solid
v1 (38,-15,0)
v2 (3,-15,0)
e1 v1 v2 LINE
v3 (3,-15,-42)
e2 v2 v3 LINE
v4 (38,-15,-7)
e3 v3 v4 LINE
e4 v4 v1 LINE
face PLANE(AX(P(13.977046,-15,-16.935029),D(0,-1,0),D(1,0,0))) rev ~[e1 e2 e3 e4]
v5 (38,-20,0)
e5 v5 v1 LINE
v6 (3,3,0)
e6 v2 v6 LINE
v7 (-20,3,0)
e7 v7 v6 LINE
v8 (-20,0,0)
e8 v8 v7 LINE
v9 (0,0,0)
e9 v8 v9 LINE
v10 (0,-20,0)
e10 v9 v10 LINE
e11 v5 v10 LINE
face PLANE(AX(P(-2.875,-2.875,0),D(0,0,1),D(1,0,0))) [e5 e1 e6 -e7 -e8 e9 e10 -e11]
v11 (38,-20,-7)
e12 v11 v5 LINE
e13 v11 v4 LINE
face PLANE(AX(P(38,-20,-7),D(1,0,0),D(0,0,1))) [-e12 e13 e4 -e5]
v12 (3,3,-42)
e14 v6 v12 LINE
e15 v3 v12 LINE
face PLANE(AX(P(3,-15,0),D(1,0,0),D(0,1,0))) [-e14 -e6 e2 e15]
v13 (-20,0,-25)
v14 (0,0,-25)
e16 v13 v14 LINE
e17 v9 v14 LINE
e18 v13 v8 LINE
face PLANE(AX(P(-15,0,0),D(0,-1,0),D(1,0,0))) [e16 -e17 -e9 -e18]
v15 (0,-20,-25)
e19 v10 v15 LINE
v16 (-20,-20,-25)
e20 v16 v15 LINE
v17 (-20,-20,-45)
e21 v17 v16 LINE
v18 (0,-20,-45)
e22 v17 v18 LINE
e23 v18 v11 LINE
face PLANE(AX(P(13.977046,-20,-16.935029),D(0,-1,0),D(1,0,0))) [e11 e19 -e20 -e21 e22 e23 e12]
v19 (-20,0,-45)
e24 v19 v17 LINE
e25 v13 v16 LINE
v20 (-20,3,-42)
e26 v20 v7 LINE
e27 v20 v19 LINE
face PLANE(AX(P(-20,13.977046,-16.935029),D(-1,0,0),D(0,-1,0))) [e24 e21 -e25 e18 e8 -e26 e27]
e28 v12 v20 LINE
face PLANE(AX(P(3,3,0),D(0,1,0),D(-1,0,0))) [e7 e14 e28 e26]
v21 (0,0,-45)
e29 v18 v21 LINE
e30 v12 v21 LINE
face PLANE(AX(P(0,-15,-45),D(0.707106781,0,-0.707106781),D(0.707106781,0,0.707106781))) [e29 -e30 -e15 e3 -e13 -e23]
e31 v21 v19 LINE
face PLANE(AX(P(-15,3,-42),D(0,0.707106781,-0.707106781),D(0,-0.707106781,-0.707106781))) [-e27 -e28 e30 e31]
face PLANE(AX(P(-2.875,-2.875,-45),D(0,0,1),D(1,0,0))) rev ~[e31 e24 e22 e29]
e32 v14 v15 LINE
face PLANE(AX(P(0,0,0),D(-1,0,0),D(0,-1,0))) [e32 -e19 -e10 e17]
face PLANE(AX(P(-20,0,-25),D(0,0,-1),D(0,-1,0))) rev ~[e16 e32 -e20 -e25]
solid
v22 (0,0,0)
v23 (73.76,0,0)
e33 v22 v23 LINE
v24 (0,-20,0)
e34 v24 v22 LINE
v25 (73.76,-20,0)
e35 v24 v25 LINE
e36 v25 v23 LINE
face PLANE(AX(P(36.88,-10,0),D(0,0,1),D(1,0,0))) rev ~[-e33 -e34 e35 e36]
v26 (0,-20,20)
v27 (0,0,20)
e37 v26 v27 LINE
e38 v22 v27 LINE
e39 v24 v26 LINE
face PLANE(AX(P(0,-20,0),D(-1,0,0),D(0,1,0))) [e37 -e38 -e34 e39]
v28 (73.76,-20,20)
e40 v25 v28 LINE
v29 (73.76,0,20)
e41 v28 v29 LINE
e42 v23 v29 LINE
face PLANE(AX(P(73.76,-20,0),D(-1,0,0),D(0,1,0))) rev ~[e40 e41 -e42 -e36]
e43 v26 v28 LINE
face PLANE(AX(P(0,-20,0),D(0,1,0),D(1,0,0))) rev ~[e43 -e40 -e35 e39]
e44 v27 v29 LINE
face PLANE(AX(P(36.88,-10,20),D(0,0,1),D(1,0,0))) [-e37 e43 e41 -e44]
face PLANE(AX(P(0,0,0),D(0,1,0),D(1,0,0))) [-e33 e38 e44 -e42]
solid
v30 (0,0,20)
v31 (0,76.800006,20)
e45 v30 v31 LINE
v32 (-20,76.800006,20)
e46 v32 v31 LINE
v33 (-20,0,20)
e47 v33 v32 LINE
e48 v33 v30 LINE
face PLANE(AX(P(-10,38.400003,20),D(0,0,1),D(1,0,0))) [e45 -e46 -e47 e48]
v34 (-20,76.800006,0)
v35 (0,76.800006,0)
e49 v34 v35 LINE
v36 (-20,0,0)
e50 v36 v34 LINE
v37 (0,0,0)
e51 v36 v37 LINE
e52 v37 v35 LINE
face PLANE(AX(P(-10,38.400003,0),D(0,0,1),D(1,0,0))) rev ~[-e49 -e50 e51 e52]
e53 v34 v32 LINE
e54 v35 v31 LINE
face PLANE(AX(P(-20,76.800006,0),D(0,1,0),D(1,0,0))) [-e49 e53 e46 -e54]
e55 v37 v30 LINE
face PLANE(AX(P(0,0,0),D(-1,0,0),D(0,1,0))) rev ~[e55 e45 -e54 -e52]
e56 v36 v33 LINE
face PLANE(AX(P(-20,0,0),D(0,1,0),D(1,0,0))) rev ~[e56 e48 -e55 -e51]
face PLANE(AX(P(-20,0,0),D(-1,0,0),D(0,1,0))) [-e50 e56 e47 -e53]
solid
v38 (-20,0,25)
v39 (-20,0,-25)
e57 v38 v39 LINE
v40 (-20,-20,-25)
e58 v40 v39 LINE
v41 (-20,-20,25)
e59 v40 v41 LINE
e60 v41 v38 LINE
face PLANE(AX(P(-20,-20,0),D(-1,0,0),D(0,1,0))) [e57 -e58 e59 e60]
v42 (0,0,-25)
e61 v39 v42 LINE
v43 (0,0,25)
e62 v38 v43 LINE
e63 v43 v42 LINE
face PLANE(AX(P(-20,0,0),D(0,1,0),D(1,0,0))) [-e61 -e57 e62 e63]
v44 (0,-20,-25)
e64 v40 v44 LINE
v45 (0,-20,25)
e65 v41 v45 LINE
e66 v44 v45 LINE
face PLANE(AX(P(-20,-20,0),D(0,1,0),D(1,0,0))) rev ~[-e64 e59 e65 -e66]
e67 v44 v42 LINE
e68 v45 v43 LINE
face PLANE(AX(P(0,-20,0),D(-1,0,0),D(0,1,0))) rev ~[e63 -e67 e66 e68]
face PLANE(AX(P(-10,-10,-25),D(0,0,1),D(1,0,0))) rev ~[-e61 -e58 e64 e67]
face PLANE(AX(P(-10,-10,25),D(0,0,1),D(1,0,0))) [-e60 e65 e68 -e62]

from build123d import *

# Parameters (mm, degrees)
F0_W          = 20
F0_H          = 76.8000064468
F1_DEPTH      = 20
F0_W_2        = 73.7599998636
F0_H_2        = 20
F2_DEPTH      = 25
F2_DEPTH_BACK = 25
F3_W          = 20
F3_H          = 20
F4_DEPTH      = 20
F5_DEPTH      = 5
F7_DEPTH      = 5
F9_DEPTH      = 45
F10_DEPTH     = 25
F11_DEPTH     = 25
F12_DEPTH     = 25


with BuildPart() as f1:
    # F0 (on Top) → F1 (new body)
    with BuildSketch(Plane.XY):
        with Locations((-10, 38.4000032234)):
            Rectangle(F0_W, F0_H)
    extrude(amount=F1_DEPTH)


with BuildPart() as f1b:
    # F0 (on Top) → F1, piece 2 (new body)
    with BuildSketch(Plane.XY):
        with Locations((36.8799999318, -10)):
            Rectangle(F0_W_2, F0_H_2)
    extrude(amount=F1_DEPTH)


with BuildPart() as f2:
    # F0 (on Top) → F2 (new body, two sides)
    with BuildSketch(Plane.XY) as f2_sk:
        with Locations((-10, -10)):
            Rectangle(F0_W, F0_H_2)
    extrude(amount=-F2_DEPTH)
    extrude(f2_sk.sketch, amount=F2_DEPTH_BACK)


with BuildPart() as f4:
    # F3 (on face) → F4 (new body)
    with BuildSketch(Plane(origin=(-20, 0, 0), x_dir=(0, -1, 0), z_dir=(-1, 0, 0))):
        with Locations((10, -35)):
            Rectangle(F3_W, F3_H)
    extrude(amount=-F4_DEPTH)

    # F3 (on face) → F5 (join)
    with BuildSketch(Plane(origin=(-20, 0, 0), x_dir=(0, -1, 0), z_dir=(-1, 0, 0))):
        Polygon((0, -45), (0, -25), (0, 0), (-38, 0), (-38, -7), align=None)
    extrude(amount=-F5_DEPTH)

    # F6 (on face) → F7 (join)
    with BuildSketch(Plane.XZ.offset(20)):
        Polygon((0, -25), (0, -45), (38, -7), (38, 0), (0, 0), align=None)
    extrude(amount=-F7_DEPTH)

    # F8 (on Top) → F9 (join)
    with BuildSketch(Plane.XY):
        Polygon((3, 3), (-15, 3), (-15, 0), (0, 0), (0, -15), (3, -15), align=None)
    extrude(amount=-F9_DEPTH)

    # F10 (cut): a face of the model
    f10_faces = [f4.faces().sort_by_distance(p)[0] for p in [
        (-15, 2, -44),
    ]]
    extrude(f10_faces, amount=-F10_DEPTH, mode=Mode.SUBTRACT)

    # F11 (cut): a face of the model
    f11_faces = [f4.faces().sort_by_distance(p)[0] for p in [
        (2, -15, -44),
    ]]
    extrude(f11_faces, amount=-F11_DEPTH, mode=Mode.SUBTRACT)

    # F12 (cut): a face of the model
    f12_faces = [f4.faces().sort_by_distance(p)[0] for p in [
        (-15, 16.3333333333, -14.3333333333),
    ]]
    extrude(f12_faces, amount=-F12_DEPTH, mode=Mode.SUBTRACT)


solid = Compound([f1.part, f1b.part, f2.part, f4.part])
